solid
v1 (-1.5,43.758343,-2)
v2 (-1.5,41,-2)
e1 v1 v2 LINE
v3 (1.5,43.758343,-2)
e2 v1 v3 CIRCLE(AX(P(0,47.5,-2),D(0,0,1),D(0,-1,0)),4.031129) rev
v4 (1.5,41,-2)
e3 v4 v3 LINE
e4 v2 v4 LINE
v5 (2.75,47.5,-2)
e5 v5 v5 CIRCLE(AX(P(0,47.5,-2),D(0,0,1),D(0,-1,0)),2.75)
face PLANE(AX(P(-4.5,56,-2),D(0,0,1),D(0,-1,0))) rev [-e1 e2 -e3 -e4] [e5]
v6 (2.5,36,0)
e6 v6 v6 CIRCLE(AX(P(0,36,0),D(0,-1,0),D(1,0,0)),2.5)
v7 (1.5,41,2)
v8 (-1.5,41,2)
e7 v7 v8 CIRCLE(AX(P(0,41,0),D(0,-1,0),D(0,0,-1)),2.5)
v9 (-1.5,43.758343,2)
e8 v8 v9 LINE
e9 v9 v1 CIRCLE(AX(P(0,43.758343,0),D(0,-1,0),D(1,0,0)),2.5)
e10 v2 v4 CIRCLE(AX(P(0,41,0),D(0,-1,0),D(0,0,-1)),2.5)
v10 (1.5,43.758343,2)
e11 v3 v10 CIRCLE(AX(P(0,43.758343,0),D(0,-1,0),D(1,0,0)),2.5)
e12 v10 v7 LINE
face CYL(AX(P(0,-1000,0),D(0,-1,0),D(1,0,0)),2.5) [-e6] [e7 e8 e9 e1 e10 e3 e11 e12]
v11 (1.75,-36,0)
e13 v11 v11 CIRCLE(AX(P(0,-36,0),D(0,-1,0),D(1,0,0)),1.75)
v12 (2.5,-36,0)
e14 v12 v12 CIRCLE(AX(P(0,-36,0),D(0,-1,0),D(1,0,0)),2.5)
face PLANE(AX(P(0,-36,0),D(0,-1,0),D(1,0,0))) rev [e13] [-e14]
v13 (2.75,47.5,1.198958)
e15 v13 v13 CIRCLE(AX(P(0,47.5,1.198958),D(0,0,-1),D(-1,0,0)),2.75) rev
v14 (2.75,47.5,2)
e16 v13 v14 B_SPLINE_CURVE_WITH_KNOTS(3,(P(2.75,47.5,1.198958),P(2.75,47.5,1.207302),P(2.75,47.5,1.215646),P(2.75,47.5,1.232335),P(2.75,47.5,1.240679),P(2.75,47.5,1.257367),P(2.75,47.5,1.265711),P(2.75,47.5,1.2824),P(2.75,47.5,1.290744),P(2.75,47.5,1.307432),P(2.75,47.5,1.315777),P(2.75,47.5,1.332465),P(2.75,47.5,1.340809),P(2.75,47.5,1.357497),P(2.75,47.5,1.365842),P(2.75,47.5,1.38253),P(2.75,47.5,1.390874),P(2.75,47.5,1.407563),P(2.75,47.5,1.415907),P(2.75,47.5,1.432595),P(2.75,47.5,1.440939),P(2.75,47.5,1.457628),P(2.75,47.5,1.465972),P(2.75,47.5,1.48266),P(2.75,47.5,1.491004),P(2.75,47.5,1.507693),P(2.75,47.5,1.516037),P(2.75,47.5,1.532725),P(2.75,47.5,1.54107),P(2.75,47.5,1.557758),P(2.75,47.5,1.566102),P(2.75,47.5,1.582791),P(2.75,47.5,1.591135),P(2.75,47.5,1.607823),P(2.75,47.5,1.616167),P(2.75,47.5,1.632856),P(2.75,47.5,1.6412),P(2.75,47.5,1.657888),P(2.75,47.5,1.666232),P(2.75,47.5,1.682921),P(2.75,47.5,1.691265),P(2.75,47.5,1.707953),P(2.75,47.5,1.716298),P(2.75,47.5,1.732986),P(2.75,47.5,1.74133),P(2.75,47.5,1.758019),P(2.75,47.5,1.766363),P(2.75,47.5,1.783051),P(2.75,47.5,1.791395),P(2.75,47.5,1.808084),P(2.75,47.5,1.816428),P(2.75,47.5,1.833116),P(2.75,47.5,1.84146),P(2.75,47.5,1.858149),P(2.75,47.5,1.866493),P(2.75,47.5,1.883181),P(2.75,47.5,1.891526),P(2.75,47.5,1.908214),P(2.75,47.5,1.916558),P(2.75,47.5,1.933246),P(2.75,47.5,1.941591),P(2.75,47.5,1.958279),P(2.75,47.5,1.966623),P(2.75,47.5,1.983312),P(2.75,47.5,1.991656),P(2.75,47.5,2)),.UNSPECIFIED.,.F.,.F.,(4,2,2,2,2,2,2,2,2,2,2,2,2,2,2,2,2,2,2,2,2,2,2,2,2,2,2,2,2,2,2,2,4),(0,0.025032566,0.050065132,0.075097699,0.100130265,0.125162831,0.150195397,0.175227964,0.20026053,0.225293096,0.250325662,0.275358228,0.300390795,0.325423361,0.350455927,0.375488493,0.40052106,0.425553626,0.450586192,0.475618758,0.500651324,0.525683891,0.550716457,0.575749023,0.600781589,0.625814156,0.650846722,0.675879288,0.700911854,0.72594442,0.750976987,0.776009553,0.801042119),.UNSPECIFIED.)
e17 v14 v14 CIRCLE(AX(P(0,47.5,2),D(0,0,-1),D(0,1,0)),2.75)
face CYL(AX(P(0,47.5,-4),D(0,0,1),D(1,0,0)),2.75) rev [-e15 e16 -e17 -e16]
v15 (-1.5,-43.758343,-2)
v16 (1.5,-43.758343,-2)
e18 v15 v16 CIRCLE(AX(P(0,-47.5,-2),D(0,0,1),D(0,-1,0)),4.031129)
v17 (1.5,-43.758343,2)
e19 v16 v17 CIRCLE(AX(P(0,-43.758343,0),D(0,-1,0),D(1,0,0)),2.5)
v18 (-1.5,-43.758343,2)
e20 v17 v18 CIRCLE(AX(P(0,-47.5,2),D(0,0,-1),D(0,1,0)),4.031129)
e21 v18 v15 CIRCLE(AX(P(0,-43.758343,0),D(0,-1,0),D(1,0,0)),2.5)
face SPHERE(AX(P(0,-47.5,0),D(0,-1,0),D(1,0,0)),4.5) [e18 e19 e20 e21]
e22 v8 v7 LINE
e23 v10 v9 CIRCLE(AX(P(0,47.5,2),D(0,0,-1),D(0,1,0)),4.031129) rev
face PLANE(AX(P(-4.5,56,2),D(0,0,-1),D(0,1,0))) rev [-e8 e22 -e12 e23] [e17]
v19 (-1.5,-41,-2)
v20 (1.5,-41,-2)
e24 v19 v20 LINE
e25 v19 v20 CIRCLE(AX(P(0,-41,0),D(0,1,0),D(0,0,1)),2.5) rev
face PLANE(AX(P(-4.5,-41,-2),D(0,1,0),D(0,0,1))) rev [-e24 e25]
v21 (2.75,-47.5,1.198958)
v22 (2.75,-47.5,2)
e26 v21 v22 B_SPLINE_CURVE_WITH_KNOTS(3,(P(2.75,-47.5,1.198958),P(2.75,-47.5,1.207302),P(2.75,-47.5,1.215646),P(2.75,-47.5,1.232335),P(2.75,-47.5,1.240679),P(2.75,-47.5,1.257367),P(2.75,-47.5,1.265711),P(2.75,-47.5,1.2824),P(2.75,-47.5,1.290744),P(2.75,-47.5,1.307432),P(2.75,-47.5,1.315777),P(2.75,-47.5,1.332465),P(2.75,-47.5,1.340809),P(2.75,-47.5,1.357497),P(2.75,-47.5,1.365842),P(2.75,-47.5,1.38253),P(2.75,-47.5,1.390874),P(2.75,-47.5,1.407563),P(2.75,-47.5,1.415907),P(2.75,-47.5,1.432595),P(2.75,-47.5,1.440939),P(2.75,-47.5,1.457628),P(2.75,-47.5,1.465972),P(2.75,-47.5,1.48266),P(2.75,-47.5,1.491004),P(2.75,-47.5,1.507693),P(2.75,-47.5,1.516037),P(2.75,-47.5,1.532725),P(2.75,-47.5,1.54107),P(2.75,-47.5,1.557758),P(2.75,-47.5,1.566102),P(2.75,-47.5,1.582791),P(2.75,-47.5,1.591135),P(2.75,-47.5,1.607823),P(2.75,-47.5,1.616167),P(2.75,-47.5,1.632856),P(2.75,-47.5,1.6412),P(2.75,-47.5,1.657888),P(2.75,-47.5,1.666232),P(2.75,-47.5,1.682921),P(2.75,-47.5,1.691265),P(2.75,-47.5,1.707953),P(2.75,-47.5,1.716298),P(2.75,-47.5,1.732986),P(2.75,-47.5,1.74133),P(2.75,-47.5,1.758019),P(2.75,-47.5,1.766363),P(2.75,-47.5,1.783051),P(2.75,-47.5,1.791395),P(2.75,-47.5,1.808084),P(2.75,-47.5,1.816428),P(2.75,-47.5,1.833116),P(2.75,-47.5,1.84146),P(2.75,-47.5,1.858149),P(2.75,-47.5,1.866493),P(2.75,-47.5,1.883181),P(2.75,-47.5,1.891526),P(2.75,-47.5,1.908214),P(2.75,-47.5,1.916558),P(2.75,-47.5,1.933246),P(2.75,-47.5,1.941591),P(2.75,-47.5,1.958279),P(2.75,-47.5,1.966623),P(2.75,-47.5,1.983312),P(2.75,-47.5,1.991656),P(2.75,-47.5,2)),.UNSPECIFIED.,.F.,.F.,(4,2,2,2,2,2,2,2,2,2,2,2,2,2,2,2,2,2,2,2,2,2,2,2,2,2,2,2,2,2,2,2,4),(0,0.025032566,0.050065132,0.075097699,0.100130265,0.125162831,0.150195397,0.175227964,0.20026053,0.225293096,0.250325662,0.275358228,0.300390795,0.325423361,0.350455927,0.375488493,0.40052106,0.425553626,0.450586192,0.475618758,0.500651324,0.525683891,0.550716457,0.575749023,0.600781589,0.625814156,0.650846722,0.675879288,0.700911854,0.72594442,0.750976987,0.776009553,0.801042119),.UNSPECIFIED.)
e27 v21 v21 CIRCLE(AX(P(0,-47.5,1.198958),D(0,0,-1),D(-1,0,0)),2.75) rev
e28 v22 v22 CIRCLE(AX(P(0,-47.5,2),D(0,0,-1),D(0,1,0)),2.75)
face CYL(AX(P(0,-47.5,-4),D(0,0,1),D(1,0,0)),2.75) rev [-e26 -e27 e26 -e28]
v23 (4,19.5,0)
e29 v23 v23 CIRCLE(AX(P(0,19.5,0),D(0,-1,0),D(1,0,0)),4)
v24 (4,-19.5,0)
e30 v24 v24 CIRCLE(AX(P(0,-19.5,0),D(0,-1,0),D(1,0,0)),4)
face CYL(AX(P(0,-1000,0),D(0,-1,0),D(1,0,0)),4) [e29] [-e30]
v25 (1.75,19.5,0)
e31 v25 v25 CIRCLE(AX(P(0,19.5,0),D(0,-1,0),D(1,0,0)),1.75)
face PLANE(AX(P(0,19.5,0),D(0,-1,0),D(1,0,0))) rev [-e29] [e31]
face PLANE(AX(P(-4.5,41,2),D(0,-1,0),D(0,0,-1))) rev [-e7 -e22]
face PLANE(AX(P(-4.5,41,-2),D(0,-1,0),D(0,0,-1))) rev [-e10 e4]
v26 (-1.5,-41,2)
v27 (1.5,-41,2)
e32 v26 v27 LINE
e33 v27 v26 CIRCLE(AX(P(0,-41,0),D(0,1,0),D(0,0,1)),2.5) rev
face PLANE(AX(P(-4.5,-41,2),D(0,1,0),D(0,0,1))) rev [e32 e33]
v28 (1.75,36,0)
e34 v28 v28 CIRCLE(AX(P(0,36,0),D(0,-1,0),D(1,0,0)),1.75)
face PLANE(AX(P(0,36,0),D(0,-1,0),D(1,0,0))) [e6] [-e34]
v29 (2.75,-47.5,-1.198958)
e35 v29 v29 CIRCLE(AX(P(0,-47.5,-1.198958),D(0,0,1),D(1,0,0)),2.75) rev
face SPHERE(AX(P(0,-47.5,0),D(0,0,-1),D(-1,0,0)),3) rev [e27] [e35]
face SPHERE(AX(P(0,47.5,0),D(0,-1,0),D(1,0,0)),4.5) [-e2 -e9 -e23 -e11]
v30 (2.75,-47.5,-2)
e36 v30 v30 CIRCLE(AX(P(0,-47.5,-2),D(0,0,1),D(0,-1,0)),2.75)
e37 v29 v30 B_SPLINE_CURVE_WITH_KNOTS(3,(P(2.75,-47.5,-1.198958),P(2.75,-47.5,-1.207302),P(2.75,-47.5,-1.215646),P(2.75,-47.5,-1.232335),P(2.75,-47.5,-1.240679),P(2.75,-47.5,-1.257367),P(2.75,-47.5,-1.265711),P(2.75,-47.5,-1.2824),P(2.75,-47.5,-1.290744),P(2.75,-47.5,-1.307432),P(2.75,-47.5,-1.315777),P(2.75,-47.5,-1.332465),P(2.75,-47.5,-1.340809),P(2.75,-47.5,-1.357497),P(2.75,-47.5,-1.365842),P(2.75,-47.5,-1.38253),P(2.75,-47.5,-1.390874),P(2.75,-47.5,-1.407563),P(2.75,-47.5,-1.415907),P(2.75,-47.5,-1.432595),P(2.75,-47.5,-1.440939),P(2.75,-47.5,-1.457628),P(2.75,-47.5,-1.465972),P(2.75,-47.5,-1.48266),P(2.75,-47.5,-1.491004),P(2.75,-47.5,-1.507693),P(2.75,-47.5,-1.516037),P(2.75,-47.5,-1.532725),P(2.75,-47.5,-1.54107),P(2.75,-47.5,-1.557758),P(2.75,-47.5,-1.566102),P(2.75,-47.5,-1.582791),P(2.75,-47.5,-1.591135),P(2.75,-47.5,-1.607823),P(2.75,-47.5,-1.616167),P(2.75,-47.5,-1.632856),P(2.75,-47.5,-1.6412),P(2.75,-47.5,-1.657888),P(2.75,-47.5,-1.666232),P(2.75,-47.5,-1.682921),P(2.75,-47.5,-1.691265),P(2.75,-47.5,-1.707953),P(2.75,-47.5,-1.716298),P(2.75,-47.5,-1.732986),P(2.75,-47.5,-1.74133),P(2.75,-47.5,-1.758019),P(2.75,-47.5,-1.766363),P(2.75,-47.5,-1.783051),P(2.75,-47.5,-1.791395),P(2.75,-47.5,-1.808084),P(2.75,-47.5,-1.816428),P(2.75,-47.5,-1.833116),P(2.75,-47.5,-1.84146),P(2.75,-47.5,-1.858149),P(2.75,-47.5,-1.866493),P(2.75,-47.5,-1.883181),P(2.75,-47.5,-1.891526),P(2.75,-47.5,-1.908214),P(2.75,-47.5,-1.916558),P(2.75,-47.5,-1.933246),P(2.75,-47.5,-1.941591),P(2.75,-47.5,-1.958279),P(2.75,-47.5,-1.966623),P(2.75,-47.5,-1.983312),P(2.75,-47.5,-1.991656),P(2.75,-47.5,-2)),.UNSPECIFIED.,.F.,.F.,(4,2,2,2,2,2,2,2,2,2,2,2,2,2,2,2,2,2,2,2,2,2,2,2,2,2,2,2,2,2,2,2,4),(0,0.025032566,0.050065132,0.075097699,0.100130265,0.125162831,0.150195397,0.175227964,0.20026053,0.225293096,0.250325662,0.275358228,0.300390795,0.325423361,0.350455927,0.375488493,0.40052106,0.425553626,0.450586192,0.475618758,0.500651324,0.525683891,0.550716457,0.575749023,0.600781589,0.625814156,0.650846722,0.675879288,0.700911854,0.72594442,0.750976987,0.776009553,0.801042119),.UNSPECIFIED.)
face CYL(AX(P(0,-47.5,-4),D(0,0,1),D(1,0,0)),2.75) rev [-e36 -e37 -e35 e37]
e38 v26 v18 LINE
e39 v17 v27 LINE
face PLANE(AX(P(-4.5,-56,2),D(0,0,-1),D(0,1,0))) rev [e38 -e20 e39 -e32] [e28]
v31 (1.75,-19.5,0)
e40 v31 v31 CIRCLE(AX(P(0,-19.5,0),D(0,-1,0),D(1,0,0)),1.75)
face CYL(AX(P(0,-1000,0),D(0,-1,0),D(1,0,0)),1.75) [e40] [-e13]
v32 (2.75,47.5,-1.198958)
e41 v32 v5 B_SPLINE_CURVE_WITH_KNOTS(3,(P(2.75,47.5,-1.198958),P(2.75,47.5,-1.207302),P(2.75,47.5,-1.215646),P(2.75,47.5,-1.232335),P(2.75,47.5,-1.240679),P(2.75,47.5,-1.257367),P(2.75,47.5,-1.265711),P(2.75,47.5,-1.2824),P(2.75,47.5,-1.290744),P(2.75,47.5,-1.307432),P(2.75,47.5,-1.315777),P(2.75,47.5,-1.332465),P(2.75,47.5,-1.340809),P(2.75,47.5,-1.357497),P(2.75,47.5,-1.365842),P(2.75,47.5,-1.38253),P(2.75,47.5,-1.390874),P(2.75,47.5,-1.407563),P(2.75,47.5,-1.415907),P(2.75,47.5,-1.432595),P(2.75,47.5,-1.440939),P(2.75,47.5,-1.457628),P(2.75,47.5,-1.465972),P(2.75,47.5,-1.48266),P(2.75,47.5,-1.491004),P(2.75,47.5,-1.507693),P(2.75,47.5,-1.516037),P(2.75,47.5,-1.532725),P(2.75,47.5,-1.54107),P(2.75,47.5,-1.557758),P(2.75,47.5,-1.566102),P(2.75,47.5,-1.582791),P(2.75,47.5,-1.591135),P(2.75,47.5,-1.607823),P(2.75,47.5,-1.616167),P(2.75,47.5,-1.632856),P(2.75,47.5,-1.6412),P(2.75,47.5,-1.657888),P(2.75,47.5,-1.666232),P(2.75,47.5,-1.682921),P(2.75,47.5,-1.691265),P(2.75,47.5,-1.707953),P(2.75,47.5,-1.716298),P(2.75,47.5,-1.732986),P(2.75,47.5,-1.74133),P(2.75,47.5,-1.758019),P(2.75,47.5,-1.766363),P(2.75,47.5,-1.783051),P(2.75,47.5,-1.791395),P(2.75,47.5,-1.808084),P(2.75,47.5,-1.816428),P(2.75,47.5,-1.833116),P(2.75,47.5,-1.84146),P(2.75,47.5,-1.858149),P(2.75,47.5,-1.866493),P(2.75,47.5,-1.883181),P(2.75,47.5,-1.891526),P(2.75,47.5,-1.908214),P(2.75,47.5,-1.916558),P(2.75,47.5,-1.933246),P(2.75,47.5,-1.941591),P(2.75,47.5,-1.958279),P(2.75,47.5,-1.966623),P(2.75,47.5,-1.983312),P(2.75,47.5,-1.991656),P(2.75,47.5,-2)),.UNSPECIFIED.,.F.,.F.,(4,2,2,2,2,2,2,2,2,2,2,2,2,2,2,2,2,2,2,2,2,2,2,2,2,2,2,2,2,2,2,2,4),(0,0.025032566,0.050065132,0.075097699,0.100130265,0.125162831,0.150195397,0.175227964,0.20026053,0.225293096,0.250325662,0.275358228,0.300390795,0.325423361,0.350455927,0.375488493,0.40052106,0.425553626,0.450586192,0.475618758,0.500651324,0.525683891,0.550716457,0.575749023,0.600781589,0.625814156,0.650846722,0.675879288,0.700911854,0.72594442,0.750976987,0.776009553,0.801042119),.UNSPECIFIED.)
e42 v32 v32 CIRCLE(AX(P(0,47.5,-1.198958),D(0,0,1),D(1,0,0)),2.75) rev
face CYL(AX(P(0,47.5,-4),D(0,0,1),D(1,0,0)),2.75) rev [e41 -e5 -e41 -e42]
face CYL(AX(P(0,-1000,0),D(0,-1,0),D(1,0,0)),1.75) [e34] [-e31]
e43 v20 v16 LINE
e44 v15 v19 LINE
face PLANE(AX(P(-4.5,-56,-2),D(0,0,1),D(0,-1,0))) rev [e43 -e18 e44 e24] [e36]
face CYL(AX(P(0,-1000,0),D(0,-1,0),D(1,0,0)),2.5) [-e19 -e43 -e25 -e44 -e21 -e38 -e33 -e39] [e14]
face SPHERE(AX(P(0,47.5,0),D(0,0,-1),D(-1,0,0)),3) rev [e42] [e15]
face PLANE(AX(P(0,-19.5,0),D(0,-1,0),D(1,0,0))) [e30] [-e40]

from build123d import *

# Parameters (mm, degrees)
CUT_EXTRUDE_1_DEPTH      = 53.38797572
CUT_EXTRUDE_1_DEPTH_BACK = 53.38797572
SKETCH_3_W               = 3
SKETCH_3_H               = 15
CUT_EXTRUDE_2_DEPTH      = 53.538081427
CUT_EXTRUDE_2_DEPTH_BACK = 53.538081427
SKETCH_4_R               = 2.75


with BuildPart() as part:
    # 草圖1 → 旋轉1 (revolve)
    with BuildSketch(Plane.XY):
        with BuildLine():
            ThreePointArc((2.5, 43.758342613), (4.30624304, 48.80624304), (0, 52))
            Line((0, 52), (0, -52))
            ThreePointArc((0, -52), (4.30624304, -48.80624304), (2.5, -43.758342613))
            Line((2.5, -43.758342613), (2.5, -36))
            Line((2.5, -36), (1.75, -36))
            Line((1.75, -36), (1.75, -19.5))
            Line((1.75, -19.5), (4, -19.5))
            Line((4, -19.5), (4, 19.5))
            Line((4, 19.5), (1.75, 19.5))
            Line((1.75, 19.5), (1.75, 36))
            Line((1.75, 36), (2.5, 36))
            Line((2.5, 36), (2.5, 43.758342613))
        make_face()
    revolve(axis=Axis((0, -1000, 0), (0, 1, 0)))

    # 草圖2 → 除料-旋轉1 (revolve, cut)
    with BuildSketch(Plane.XY):
        with BuildLine():
            Line((0, 50.5), (0, 44.5))
            ThreePointArc((0, 44.5), (3, 47.5), (0, 50.5))
        make_face()
        with BuildLine():
            Line((0, -44.5), (0, -50.5))
            ThreePointArc((0, -50.5), (3, -47.5), (0, -44.5))
        make_face()
    revolve(axis=Axis((0, -1000, 0), (0, 1, 0)), mode=Mode.SUBTRACT)

    # 草圖3 → 除料-伸長1 (cut, two sides: drawn at the far end of the back side and taken through both)
    with BuildSketch(Plane(origin=(0, 0, 0), x_dir=(0, 0, -1), z_dir=(1, 0, 0)).offset(-CUT_EXTRUDE_1_DEPTH_BACK)):
        with Locations((-3.5, 48.5)):
            Rectangle(SKETCH_3_W, SKETCH_3_H)
        with Locations((3.5, 48.5)):
            Rectangle(SKETCH_3_W, SKETCH_3_H)
        with Locations((3.5, -48.5)):
            Rectangle(SKETCH_3_W, SKETCH_3_H)
        with Locations((-3.5, -48.5)):
            Rectangle(SKETCH_3_W, SKETCH_3_H)
    extrude(amount=CUT_EXTRUDE_1_DEPTH + CUT_EXTRUDE_1_DEPTH_BACK, mode=Mode.SUBTRACT)

    # 草圖4 → 除料-伸長2 (cut, two sides: drawn at the far end of the back side and taken through both)
    with BuildSketch(Plane.XY.offset(2).offset(-CUT_EXTRUDE_2_DEPTH_BACK)):
        with Locations((0, 47.5)):
            Circle(SKETCH_4_R)
        with Locations((0, -47.5)):
            Circle(SKETCH_4_R)
    extrude(amount=CUT_EXTRUDE_2_DEPTH + CUT_EXTRUDE_2_DEPTH_BACK, mode=Mode.SUBTRACT)


solid = part.part
